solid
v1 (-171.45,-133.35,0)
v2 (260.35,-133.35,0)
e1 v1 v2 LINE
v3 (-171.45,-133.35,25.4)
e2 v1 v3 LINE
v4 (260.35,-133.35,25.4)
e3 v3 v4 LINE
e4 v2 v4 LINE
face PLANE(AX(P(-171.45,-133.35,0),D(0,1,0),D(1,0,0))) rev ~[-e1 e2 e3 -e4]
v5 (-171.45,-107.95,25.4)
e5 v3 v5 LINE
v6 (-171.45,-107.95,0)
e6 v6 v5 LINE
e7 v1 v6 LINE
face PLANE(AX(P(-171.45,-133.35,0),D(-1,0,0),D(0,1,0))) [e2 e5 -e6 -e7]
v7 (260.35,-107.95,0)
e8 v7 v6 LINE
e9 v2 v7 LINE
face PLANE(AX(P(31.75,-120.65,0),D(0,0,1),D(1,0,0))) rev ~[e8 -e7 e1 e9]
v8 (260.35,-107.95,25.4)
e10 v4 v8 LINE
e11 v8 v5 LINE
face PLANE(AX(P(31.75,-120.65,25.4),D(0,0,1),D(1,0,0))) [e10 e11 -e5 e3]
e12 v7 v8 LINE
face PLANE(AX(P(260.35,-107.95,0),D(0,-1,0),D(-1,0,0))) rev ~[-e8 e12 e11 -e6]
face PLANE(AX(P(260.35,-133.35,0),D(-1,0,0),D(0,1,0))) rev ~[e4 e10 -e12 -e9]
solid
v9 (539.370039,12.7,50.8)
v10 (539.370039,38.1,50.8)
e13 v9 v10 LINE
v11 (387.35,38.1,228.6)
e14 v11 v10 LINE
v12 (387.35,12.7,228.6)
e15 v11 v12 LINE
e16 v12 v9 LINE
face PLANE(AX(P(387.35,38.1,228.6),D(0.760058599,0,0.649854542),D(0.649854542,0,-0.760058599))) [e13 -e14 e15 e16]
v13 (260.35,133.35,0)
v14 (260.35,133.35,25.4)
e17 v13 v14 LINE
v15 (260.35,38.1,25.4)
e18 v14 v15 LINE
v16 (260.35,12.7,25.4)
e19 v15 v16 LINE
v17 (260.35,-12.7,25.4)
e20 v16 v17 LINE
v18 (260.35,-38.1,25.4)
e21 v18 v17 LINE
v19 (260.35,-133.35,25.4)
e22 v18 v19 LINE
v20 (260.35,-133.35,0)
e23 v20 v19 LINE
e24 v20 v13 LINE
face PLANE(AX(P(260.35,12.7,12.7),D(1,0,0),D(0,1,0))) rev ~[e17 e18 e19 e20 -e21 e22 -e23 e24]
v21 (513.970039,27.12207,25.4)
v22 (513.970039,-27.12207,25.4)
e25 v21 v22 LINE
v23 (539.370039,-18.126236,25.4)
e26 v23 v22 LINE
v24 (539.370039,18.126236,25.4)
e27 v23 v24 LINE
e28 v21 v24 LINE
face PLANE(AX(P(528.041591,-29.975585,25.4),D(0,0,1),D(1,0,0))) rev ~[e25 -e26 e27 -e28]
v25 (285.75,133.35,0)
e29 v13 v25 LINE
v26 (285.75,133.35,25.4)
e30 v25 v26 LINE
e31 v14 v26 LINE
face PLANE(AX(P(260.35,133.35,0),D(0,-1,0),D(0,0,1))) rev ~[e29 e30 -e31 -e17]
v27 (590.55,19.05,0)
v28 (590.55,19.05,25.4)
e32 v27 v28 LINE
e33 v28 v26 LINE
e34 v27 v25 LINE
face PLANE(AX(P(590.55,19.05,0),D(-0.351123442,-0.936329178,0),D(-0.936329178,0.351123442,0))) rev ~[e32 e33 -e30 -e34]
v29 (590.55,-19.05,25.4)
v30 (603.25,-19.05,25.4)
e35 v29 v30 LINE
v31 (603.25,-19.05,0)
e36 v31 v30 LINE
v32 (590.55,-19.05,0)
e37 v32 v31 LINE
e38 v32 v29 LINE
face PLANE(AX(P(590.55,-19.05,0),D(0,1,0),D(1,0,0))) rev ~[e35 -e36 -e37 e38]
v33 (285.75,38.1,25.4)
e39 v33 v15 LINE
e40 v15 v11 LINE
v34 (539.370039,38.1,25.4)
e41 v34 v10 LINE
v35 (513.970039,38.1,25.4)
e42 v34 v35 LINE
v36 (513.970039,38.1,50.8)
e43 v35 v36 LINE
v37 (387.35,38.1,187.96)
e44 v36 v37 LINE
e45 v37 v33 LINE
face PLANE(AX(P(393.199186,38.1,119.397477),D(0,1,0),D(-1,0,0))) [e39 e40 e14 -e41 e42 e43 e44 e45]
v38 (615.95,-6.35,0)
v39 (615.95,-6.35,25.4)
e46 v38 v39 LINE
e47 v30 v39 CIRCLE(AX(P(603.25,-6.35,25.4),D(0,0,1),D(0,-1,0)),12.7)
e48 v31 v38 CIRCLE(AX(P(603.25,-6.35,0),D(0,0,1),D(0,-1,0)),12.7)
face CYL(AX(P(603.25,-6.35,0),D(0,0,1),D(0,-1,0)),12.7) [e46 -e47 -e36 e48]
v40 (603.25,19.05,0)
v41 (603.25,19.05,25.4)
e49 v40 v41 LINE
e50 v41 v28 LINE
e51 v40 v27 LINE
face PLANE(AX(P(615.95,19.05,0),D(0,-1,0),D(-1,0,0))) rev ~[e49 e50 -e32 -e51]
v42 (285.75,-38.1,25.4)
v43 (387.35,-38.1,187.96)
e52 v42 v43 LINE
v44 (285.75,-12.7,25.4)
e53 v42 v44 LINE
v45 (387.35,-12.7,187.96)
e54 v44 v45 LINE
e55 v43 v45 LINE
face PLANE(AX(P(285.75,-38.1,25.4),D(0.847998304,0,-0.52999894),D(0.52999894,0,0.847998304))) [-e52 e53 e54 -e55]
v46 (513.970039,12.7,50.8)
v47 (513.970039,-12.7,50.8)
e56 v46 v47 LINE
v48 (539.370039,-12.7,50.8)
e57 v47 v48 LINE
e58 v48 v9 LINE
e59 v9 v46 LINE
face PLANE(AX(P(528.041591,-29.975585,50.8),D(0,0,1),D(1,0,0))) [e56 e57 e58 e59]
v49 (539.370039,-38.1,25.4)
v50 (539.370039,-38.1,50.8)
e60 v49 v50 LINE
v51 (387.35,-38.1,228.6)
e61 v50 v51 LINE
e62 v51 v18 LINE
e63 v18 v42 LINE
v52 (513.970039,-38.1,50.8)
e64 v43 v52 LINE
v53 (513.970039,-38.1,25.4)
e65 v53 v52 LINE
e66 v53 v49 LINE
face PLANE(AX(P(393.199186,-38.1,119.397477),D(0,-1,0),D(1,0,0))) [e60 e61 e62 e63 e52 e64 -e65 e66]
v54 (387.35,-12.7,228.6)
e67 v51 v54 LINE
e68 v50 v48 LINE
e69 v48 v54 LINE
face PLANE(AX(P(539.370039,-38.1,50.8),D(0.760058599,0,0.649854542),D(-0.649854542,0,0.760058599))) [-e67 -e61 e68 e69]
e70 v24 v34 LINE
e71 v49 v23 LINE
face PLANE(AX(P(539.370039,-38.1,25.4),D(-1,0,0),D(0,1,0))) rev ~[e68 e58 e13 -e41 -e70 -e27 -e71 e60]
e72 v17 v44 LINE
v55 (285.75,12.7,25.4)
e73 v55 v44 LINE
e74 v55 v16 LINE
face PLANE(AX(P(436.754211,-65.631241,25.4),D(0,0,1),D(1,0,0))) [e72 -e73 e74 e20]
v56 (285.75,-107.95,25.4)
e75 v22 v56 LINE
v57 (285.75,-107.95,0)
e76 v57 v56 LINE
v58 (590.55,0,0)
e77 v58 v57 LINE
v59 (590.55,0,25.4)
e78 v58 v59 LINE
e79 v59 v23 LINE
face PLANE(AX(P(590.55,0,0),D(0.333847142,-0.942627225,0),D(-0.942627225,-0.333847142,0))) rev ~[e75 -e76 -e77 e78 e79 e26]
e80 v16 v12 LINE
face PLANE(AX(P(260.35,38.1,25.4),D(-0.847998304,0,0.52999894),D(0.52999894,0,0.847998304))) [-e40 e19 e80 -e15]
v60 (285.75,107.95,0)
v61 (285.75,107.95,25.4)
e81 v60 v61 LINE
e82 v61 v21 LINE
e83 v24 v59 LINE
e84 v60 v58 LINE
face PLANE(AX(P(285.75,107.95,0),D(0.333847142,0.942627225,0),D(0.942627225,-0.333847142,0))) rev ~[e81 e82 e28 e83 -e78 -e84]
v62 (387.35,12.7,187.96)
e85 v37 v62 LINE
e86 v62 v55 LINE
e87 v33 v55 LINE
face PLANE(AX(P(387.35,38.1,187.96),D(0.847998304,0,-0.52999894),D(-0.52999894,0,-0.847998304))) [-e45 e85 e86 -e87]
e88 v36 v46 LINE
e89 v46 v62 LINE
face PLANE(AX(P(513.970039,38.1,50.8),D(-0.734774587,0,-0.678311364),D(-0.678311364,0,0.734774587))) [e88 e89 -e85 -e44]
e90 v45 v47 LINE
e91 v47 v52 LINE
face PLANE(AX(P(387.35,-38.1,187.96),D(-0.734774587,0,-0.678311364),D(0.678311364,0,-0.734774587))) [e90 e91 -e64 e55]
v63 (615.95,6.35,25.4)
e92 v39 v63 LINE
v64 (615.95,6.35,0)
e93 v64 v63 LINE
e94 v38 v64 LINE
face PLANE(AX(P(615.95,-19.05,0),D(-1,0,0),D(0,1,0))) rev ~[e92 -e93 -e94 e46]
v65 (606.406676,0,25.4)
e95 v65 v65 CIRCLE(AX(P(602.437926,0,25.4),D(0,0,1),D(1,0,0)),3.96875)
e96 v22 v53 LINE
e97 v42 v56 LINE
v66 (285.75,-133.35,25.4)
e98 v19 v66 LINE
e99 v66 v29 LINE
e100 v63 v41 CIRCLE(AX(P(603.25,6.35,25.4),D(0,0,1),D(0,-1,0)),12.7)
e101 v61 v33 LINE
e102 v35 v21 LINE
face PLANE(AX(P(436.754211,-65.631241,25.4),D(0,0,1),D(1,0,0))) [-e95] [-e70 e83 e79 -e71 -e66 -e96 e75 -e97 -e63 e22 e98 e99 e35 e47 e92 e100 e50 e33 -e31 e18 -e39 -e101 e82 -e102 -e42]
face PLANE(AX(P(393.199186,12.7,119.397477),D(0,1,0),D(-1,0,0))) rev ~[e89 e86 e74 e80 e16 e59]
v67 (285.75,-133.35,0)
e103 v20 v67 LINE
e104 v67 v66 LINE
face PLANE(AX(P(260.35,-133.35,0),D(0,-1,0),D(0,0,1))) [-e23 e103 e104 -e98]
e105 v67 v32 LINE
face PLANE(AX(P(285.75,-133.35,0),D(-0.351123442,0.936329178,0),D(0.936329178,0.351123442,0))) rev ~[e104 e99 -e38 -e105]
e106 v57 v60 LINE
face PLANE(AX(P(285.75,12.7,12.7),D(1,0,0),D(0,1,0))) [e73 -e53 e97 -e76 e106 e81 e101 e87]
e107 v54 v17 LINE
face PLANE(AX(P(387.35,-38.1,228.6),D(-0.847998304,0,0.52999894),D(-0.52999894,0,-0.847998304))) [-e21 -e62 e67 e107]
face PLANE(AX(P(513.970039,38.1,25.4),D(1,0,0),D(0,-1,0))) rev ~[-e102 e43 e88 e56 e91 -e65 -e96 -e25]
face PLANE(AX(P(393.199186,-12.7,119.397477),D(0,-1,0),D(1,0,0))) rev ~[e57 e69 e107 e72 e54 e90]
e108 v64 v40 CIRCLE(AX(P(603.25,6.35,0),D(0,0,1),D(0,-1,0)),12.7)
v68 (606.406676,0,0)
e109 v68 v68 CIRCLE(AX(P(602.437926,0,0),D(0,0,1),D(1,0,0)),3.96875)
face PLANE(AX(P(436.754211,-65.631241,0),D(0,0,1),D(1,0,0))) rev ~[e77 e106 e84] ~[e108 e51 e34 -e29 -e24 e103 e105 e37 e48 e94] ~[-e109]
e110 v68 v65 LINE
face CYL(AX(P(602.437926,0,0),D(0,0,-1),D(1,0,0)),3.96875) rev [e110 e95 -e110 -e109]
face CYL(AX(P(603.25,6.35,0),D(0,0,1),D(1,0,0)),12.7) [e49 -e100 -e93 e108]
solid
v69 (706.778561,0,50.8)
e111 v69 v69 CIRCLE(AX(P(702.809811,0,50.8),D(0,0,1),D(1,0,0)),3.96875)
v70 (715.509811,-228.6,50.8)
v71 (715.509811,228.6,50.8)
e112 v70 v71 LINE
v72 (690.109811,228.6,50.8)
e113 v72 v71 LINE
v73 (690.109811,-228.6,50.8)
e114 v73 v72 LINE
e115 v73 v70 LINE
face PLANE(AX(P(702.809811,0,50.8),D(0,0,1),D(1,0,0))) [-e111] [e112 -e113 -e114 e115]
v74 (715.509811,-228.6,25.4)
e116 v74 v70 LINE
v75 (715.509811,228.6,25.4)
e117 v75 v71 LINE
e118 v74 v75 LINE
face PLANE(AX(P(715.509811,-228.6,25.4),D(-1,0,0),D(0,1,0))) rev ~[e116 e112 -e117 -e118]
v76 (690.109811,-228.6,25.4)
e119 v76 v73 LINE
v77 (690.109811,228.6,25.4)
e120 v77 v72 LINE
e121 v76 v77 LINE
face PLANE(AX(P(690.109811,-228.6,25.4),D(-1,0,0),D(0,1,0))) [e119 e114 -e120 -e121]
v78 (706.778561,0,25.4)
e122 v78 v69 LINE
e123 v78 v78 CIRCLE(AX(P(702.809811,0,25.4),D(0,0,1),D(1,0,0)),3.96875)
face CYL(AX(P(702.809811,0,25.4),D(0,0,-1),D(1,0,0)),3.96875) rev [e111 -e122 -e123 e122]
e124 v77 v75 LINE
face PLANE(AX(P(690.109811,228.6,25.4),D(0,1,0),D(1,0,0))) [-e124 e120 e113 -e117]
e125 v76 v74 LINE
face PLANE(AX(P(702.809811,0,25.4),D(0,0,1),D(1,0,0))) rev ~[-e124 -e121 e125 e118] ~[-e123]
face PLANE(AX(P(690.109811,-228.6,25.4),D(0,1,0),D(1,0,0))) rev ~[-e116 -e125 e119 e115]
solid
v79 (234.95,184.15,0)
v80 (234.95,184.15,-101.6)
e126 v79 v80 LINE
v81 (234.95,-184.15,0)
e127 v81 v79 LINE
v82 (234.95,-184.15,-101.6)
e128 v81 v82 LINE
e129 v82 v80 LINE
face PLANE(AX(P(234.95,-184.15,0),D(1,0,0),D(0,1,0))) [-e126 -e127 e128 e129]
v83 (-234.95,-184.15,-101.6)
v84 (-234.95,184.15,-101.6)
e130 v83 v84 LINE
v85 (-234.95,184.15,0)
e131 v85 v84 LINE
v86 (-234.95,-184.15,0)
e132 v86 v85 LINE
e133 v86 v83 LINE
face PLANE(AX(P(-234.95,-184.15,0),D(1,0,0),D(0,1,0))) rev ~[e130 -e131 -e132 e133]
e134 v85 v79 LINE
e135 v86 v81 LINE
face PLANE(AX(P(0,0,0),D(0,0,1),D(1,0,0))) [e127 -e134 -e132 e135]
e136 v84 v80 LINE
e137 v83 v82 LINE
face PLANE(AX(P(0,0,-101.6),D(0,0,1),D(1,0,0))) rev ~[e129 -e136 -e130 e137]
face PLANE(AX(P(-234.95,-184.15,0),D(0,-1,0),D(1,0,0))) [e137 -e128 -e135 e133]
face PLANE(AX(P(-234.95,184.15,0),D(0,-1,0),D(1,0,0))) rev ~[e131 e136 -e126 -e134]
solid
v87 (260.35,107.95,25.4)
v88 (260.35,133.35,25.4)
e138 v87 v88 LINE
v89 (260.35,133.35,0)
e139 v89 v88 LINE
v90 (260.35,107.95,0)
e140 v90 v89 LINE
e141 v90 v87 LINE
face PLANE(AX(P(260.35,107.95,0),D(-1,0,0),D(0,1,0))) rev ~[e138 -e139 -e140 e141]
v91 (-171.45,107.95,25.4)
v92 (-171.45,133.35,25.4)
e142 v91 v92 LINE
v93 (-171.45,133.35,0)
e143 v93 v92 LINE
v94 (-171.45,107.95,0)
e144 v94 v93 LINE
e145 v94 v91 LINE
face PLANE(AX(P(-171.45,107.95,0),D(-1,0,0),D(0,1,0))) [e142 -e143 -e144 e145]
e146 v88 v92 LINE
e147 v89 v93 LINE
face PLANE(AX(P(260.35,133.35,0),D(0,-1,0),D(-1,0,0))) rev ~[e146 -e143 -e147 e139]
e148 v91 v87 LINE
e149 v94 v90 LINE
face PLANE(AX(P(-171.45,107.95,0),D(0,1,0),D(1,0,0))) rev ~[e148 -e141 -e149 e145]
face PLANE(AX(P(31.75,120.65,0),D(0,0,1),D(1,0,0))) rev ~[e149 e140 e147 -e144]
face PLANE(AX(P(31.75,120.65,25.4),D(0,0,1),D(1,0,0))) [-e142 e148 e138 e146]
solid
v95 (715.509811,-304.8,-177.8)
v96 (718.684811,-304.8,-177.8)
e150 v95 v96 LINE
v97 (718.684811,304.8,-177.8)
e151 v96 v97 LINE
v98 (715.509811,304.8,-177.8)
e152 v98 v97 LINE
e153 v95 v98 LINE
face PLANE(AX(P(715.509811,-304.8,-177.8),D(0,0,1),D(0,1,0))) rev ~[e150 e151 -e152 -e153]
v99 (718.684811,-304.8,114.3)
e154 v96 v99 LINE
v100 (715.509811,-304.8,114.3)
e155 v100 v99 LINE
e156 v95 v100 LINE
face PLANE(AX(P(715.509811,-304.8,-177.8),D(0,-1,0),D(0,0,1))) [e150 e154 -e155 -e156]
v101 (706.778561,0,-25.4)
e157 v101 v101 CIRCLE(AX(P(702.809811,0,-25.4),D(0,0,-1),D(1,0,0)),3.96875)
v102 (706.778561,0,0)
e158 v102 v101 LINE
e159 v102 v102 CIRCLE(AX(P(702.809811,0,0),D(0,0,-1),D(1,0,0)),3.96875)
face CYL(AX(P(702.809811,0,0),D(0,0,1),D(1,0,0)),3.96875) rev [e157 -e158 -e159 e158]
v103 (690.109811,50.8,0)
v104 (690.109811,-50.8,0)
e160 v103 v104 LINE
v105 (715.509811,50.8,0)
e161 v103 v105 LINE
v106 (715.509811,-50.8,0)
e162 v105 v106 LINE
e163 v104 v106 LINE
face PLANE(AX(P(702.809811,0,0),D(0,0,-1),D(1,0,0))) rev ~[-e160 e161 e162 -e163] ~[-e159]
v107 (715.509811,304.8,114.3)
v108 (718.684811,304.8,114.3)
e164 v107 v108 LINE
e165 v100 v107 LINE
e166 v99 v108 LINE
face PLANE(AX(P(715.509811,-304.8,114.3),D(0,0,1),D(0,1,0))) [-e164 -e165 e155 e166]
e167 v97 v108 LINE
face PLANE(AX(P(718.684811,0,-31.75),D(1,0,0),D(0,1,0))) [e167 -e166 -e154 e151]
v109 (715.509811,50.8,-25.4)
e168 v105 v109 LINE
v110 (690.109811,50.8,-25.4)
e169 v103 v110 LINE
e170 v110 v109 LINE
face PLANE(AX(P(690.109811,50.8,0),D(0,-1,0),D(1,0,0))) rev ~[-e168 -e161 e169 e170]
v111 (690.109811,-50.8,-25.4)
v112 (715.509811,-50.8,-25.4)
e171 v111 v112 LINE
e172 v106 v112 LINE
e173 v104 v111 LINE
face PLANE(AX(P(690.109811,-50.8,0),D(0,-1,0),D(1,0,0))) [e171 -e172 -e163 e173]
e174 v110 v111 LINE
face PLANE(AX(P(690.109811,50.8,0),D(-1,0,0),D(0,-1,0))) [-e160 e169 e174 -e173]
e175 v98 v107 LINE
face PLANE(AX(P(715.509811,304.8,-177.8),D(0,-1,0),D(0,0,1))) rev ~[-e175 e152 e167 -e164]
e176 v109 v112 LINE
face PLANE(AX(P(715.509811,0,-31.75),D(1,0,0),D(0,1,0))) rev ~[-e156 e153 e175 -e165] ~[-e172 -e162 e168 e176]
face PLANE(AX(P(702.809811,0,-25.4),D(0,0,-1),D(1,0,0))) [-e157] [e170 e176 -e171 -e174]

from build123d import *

# Parameters (mm, degrees)
F1_W      = 406.4
F1_H      = 25.4
F1_W_2    = 25.4
F2_DEPTH  = 25.4
F3_W      = 241.3
F3_H      = 25.4
F3_W_2    = 25.4
F4_DEPTH  = 25.4
F0_W      = 469.9
F0_H      = 368.3
F5_DEPTH  = 101.6
F6_R      = 3.96875
F7_DEPTH  = 25.4
F8_W      = 25.4
F8_H      = 457.2
F8_R      = 3.96875
F9_DEPTH  = 25.4
F10_W     = 25.4
F10_H     = 101.6
F10_R     = 3.96875
F11_DEPTH = 25.4
F12_W     = 609.6
F12_H     = 292.1
F12_W_2   = 457.2
F12_H_2   = 25.4
F13_DEPTH = 3.175
F14_R     = 12.7
F16_DEPTH = 25.4
F18_DEPTH = 25.4
F20_DEPTH = 25.4


# Not quite as in the source:
# - a feature names something its author has since deleted; it is built from what else it names


with BuildPart() as f2:
    # F1 (on face) → F2 (new body)
    with BuildSketch(Plane.XY):
        with Locations((31.75, -120.65)):
            Rectangle(F1_W, F1_H)
        with Locations((247.65, -120.65)):
            Rectangle(F1_W_2, F1_H)
    extrude(amount=F2_DEPTH)


with BuildPart() as f2b:
    # F1 (on face) → F2, piece 2 (new body)
    with BuildSketch(Plane.XY):
        with Locations((31.75, 120.65)):
            Rectangle(F1_W, F1_H)
        with Locations((247.65, 120.65)):
            Rectangle(F1_W_2, F1_H)
    extrude(amount=F2_DEPTH)


with BuildPart() as f4:
    # F3 (on face) → F4 (new body)
    with BuildSketch(Plane.YZ.offset(260.35)):
        with Locations((12.7, 12.7)):
            Rectangle(F3_W, F3_H)
        with Locations((-120.65, 12.7)):
            Rectangle(F3_W_2, F3_H)
    extrude(amount=F4_DEPTH)

    # F6 (on face) → F7 (join)
    with BuildSketch(Plane.XY):
        Polygon((285.75, -107.95), (285.75, -133.35), (590.55, -19.05), (590.55, 0), align=None)
        Polygon((590.55, 19.05), (285.75, 133.35), (285.75, 107.95), (590.55, 0), align=None)
        Polygon((615.95, 19.05), (590.55, 19.05), (590.55, 0), (590.55, -19.05), (615.95, -19.05), align=None)
        with Locations((602.4379256336, 0)):
            Circle(F6_R, mode=Mode.SUBTRACT)
    extrude(amount=F7_DEPTH)

    # F14
    f14_edges = [f4.edges().sort_by_distance(p)[0] for p in [
        (615.95, 19.05, 12.7),
        (615.95, -19.05, 12.7),
    ]]
    fillet(f14_edges, radius=F14_R)

    # F15 (on face) → F16 (join)
    with BuildSketch(Plane.XY.offset(25.4)):
        Polygon((539.3700387001, -18.1262362937), (513.9700387001, -27.122069627), (513.9700387001, -38.1), (539.3700387001, -38.1), align=None)
        Polygon((539.3700387001, 18.1262362937), (513.9700387001, 27.122069627), (513.9700387001, -27.122069627), (539.3700387001, -18.1262362937), align=None)
        Polygon((539.3700387001, 38.1), (513.9700387001, 38.1), (513.9700387001, 27.122069627), (539.3700387001, 18.1262362937), align=None)
    extrude(amount=F16_DEPTH)

    # F17 (on face) → F18 (join)
    with BuildSketch(Plane.XZ.offset(38.1)):
        Polygon((260.35, 25.4), (285.75, 25.4), (387.35, 187.96), (513.9700387001, 50.8), (539.3700387001, 50.8), (387.35, 228.6), align=None)
    extrude(amount=-F18_DEPTH)

    # F19 (on face) → F20 (join)
    with BuildSketch(Plane(origin=(0, 38.1, 0), x_dir=(-1, 0, 0), z_dir=(0, 1, 0))):
        Polygon((-539.3700387001, 50.8), (-513.9700387001, 50.8), (-387.35, 187.96), (-285.75, 25.4), (-260.35, 25.4), (-387.35, 228.6), align=None)
    extrude(amount=-F20_DEPTH)


with BuildPart() as f5:
    # F0 (on Top) → F5 (new body)
    with BuildSketch(Plane.XY):
        Rectangle(F0_W, F0_H)
    extrude(amount=-F5_DEPTH)


with BuildPart() as f9:
    # F8 (on face) → F9 (new body)
    with BuildSketch(Plane.XY.offset(25.4)):
        with Locations((702.8098106384, 0)):
            Rectangle(F8_W, F8_H)
        with Locations((702.8098106384, 0)):
            Circle(F8_R, mode=Mode.SUBTRACT)
    extrude(amount=F9_DEPTH)


with BuildPart() as f11:
    # F10 (on face) → F11 (new body)
    with BuildSketch(Plane(origin=(0, 0, 0), x_dir=(1, 0, 0), z_dir=(0, 0, -1))):
        with Locations((702.8098106384, 0)):
            Rectangle(F10_W, F10_H)
        with Locations((702.8098106384, 0)):
            Circle(F10_R, mode=Mode.SUBTRACT)
    extrude(amount=F11_DEPTH)

    # F12 (on face) → F13 (join)
    with BuildSketch(Plane.YZ.offset(715.5098106384)):
        with Locations((0, -31.75)):
            Rectangle(F12_W, F12_H)
        with Locations((0, 38.1)):
            Rectangle(F12_W_2, F12_H_2, mode=Mode.SUBTRACT)
        with Locations((0, 38.1)):
            Rectangle(F12_W_2, F12_H_2)
    extrude(amount=F13_DEPTH)


solid = Compound([f2.part, f2b.part, f4.part, f5.part, f9.part, f11.part])
